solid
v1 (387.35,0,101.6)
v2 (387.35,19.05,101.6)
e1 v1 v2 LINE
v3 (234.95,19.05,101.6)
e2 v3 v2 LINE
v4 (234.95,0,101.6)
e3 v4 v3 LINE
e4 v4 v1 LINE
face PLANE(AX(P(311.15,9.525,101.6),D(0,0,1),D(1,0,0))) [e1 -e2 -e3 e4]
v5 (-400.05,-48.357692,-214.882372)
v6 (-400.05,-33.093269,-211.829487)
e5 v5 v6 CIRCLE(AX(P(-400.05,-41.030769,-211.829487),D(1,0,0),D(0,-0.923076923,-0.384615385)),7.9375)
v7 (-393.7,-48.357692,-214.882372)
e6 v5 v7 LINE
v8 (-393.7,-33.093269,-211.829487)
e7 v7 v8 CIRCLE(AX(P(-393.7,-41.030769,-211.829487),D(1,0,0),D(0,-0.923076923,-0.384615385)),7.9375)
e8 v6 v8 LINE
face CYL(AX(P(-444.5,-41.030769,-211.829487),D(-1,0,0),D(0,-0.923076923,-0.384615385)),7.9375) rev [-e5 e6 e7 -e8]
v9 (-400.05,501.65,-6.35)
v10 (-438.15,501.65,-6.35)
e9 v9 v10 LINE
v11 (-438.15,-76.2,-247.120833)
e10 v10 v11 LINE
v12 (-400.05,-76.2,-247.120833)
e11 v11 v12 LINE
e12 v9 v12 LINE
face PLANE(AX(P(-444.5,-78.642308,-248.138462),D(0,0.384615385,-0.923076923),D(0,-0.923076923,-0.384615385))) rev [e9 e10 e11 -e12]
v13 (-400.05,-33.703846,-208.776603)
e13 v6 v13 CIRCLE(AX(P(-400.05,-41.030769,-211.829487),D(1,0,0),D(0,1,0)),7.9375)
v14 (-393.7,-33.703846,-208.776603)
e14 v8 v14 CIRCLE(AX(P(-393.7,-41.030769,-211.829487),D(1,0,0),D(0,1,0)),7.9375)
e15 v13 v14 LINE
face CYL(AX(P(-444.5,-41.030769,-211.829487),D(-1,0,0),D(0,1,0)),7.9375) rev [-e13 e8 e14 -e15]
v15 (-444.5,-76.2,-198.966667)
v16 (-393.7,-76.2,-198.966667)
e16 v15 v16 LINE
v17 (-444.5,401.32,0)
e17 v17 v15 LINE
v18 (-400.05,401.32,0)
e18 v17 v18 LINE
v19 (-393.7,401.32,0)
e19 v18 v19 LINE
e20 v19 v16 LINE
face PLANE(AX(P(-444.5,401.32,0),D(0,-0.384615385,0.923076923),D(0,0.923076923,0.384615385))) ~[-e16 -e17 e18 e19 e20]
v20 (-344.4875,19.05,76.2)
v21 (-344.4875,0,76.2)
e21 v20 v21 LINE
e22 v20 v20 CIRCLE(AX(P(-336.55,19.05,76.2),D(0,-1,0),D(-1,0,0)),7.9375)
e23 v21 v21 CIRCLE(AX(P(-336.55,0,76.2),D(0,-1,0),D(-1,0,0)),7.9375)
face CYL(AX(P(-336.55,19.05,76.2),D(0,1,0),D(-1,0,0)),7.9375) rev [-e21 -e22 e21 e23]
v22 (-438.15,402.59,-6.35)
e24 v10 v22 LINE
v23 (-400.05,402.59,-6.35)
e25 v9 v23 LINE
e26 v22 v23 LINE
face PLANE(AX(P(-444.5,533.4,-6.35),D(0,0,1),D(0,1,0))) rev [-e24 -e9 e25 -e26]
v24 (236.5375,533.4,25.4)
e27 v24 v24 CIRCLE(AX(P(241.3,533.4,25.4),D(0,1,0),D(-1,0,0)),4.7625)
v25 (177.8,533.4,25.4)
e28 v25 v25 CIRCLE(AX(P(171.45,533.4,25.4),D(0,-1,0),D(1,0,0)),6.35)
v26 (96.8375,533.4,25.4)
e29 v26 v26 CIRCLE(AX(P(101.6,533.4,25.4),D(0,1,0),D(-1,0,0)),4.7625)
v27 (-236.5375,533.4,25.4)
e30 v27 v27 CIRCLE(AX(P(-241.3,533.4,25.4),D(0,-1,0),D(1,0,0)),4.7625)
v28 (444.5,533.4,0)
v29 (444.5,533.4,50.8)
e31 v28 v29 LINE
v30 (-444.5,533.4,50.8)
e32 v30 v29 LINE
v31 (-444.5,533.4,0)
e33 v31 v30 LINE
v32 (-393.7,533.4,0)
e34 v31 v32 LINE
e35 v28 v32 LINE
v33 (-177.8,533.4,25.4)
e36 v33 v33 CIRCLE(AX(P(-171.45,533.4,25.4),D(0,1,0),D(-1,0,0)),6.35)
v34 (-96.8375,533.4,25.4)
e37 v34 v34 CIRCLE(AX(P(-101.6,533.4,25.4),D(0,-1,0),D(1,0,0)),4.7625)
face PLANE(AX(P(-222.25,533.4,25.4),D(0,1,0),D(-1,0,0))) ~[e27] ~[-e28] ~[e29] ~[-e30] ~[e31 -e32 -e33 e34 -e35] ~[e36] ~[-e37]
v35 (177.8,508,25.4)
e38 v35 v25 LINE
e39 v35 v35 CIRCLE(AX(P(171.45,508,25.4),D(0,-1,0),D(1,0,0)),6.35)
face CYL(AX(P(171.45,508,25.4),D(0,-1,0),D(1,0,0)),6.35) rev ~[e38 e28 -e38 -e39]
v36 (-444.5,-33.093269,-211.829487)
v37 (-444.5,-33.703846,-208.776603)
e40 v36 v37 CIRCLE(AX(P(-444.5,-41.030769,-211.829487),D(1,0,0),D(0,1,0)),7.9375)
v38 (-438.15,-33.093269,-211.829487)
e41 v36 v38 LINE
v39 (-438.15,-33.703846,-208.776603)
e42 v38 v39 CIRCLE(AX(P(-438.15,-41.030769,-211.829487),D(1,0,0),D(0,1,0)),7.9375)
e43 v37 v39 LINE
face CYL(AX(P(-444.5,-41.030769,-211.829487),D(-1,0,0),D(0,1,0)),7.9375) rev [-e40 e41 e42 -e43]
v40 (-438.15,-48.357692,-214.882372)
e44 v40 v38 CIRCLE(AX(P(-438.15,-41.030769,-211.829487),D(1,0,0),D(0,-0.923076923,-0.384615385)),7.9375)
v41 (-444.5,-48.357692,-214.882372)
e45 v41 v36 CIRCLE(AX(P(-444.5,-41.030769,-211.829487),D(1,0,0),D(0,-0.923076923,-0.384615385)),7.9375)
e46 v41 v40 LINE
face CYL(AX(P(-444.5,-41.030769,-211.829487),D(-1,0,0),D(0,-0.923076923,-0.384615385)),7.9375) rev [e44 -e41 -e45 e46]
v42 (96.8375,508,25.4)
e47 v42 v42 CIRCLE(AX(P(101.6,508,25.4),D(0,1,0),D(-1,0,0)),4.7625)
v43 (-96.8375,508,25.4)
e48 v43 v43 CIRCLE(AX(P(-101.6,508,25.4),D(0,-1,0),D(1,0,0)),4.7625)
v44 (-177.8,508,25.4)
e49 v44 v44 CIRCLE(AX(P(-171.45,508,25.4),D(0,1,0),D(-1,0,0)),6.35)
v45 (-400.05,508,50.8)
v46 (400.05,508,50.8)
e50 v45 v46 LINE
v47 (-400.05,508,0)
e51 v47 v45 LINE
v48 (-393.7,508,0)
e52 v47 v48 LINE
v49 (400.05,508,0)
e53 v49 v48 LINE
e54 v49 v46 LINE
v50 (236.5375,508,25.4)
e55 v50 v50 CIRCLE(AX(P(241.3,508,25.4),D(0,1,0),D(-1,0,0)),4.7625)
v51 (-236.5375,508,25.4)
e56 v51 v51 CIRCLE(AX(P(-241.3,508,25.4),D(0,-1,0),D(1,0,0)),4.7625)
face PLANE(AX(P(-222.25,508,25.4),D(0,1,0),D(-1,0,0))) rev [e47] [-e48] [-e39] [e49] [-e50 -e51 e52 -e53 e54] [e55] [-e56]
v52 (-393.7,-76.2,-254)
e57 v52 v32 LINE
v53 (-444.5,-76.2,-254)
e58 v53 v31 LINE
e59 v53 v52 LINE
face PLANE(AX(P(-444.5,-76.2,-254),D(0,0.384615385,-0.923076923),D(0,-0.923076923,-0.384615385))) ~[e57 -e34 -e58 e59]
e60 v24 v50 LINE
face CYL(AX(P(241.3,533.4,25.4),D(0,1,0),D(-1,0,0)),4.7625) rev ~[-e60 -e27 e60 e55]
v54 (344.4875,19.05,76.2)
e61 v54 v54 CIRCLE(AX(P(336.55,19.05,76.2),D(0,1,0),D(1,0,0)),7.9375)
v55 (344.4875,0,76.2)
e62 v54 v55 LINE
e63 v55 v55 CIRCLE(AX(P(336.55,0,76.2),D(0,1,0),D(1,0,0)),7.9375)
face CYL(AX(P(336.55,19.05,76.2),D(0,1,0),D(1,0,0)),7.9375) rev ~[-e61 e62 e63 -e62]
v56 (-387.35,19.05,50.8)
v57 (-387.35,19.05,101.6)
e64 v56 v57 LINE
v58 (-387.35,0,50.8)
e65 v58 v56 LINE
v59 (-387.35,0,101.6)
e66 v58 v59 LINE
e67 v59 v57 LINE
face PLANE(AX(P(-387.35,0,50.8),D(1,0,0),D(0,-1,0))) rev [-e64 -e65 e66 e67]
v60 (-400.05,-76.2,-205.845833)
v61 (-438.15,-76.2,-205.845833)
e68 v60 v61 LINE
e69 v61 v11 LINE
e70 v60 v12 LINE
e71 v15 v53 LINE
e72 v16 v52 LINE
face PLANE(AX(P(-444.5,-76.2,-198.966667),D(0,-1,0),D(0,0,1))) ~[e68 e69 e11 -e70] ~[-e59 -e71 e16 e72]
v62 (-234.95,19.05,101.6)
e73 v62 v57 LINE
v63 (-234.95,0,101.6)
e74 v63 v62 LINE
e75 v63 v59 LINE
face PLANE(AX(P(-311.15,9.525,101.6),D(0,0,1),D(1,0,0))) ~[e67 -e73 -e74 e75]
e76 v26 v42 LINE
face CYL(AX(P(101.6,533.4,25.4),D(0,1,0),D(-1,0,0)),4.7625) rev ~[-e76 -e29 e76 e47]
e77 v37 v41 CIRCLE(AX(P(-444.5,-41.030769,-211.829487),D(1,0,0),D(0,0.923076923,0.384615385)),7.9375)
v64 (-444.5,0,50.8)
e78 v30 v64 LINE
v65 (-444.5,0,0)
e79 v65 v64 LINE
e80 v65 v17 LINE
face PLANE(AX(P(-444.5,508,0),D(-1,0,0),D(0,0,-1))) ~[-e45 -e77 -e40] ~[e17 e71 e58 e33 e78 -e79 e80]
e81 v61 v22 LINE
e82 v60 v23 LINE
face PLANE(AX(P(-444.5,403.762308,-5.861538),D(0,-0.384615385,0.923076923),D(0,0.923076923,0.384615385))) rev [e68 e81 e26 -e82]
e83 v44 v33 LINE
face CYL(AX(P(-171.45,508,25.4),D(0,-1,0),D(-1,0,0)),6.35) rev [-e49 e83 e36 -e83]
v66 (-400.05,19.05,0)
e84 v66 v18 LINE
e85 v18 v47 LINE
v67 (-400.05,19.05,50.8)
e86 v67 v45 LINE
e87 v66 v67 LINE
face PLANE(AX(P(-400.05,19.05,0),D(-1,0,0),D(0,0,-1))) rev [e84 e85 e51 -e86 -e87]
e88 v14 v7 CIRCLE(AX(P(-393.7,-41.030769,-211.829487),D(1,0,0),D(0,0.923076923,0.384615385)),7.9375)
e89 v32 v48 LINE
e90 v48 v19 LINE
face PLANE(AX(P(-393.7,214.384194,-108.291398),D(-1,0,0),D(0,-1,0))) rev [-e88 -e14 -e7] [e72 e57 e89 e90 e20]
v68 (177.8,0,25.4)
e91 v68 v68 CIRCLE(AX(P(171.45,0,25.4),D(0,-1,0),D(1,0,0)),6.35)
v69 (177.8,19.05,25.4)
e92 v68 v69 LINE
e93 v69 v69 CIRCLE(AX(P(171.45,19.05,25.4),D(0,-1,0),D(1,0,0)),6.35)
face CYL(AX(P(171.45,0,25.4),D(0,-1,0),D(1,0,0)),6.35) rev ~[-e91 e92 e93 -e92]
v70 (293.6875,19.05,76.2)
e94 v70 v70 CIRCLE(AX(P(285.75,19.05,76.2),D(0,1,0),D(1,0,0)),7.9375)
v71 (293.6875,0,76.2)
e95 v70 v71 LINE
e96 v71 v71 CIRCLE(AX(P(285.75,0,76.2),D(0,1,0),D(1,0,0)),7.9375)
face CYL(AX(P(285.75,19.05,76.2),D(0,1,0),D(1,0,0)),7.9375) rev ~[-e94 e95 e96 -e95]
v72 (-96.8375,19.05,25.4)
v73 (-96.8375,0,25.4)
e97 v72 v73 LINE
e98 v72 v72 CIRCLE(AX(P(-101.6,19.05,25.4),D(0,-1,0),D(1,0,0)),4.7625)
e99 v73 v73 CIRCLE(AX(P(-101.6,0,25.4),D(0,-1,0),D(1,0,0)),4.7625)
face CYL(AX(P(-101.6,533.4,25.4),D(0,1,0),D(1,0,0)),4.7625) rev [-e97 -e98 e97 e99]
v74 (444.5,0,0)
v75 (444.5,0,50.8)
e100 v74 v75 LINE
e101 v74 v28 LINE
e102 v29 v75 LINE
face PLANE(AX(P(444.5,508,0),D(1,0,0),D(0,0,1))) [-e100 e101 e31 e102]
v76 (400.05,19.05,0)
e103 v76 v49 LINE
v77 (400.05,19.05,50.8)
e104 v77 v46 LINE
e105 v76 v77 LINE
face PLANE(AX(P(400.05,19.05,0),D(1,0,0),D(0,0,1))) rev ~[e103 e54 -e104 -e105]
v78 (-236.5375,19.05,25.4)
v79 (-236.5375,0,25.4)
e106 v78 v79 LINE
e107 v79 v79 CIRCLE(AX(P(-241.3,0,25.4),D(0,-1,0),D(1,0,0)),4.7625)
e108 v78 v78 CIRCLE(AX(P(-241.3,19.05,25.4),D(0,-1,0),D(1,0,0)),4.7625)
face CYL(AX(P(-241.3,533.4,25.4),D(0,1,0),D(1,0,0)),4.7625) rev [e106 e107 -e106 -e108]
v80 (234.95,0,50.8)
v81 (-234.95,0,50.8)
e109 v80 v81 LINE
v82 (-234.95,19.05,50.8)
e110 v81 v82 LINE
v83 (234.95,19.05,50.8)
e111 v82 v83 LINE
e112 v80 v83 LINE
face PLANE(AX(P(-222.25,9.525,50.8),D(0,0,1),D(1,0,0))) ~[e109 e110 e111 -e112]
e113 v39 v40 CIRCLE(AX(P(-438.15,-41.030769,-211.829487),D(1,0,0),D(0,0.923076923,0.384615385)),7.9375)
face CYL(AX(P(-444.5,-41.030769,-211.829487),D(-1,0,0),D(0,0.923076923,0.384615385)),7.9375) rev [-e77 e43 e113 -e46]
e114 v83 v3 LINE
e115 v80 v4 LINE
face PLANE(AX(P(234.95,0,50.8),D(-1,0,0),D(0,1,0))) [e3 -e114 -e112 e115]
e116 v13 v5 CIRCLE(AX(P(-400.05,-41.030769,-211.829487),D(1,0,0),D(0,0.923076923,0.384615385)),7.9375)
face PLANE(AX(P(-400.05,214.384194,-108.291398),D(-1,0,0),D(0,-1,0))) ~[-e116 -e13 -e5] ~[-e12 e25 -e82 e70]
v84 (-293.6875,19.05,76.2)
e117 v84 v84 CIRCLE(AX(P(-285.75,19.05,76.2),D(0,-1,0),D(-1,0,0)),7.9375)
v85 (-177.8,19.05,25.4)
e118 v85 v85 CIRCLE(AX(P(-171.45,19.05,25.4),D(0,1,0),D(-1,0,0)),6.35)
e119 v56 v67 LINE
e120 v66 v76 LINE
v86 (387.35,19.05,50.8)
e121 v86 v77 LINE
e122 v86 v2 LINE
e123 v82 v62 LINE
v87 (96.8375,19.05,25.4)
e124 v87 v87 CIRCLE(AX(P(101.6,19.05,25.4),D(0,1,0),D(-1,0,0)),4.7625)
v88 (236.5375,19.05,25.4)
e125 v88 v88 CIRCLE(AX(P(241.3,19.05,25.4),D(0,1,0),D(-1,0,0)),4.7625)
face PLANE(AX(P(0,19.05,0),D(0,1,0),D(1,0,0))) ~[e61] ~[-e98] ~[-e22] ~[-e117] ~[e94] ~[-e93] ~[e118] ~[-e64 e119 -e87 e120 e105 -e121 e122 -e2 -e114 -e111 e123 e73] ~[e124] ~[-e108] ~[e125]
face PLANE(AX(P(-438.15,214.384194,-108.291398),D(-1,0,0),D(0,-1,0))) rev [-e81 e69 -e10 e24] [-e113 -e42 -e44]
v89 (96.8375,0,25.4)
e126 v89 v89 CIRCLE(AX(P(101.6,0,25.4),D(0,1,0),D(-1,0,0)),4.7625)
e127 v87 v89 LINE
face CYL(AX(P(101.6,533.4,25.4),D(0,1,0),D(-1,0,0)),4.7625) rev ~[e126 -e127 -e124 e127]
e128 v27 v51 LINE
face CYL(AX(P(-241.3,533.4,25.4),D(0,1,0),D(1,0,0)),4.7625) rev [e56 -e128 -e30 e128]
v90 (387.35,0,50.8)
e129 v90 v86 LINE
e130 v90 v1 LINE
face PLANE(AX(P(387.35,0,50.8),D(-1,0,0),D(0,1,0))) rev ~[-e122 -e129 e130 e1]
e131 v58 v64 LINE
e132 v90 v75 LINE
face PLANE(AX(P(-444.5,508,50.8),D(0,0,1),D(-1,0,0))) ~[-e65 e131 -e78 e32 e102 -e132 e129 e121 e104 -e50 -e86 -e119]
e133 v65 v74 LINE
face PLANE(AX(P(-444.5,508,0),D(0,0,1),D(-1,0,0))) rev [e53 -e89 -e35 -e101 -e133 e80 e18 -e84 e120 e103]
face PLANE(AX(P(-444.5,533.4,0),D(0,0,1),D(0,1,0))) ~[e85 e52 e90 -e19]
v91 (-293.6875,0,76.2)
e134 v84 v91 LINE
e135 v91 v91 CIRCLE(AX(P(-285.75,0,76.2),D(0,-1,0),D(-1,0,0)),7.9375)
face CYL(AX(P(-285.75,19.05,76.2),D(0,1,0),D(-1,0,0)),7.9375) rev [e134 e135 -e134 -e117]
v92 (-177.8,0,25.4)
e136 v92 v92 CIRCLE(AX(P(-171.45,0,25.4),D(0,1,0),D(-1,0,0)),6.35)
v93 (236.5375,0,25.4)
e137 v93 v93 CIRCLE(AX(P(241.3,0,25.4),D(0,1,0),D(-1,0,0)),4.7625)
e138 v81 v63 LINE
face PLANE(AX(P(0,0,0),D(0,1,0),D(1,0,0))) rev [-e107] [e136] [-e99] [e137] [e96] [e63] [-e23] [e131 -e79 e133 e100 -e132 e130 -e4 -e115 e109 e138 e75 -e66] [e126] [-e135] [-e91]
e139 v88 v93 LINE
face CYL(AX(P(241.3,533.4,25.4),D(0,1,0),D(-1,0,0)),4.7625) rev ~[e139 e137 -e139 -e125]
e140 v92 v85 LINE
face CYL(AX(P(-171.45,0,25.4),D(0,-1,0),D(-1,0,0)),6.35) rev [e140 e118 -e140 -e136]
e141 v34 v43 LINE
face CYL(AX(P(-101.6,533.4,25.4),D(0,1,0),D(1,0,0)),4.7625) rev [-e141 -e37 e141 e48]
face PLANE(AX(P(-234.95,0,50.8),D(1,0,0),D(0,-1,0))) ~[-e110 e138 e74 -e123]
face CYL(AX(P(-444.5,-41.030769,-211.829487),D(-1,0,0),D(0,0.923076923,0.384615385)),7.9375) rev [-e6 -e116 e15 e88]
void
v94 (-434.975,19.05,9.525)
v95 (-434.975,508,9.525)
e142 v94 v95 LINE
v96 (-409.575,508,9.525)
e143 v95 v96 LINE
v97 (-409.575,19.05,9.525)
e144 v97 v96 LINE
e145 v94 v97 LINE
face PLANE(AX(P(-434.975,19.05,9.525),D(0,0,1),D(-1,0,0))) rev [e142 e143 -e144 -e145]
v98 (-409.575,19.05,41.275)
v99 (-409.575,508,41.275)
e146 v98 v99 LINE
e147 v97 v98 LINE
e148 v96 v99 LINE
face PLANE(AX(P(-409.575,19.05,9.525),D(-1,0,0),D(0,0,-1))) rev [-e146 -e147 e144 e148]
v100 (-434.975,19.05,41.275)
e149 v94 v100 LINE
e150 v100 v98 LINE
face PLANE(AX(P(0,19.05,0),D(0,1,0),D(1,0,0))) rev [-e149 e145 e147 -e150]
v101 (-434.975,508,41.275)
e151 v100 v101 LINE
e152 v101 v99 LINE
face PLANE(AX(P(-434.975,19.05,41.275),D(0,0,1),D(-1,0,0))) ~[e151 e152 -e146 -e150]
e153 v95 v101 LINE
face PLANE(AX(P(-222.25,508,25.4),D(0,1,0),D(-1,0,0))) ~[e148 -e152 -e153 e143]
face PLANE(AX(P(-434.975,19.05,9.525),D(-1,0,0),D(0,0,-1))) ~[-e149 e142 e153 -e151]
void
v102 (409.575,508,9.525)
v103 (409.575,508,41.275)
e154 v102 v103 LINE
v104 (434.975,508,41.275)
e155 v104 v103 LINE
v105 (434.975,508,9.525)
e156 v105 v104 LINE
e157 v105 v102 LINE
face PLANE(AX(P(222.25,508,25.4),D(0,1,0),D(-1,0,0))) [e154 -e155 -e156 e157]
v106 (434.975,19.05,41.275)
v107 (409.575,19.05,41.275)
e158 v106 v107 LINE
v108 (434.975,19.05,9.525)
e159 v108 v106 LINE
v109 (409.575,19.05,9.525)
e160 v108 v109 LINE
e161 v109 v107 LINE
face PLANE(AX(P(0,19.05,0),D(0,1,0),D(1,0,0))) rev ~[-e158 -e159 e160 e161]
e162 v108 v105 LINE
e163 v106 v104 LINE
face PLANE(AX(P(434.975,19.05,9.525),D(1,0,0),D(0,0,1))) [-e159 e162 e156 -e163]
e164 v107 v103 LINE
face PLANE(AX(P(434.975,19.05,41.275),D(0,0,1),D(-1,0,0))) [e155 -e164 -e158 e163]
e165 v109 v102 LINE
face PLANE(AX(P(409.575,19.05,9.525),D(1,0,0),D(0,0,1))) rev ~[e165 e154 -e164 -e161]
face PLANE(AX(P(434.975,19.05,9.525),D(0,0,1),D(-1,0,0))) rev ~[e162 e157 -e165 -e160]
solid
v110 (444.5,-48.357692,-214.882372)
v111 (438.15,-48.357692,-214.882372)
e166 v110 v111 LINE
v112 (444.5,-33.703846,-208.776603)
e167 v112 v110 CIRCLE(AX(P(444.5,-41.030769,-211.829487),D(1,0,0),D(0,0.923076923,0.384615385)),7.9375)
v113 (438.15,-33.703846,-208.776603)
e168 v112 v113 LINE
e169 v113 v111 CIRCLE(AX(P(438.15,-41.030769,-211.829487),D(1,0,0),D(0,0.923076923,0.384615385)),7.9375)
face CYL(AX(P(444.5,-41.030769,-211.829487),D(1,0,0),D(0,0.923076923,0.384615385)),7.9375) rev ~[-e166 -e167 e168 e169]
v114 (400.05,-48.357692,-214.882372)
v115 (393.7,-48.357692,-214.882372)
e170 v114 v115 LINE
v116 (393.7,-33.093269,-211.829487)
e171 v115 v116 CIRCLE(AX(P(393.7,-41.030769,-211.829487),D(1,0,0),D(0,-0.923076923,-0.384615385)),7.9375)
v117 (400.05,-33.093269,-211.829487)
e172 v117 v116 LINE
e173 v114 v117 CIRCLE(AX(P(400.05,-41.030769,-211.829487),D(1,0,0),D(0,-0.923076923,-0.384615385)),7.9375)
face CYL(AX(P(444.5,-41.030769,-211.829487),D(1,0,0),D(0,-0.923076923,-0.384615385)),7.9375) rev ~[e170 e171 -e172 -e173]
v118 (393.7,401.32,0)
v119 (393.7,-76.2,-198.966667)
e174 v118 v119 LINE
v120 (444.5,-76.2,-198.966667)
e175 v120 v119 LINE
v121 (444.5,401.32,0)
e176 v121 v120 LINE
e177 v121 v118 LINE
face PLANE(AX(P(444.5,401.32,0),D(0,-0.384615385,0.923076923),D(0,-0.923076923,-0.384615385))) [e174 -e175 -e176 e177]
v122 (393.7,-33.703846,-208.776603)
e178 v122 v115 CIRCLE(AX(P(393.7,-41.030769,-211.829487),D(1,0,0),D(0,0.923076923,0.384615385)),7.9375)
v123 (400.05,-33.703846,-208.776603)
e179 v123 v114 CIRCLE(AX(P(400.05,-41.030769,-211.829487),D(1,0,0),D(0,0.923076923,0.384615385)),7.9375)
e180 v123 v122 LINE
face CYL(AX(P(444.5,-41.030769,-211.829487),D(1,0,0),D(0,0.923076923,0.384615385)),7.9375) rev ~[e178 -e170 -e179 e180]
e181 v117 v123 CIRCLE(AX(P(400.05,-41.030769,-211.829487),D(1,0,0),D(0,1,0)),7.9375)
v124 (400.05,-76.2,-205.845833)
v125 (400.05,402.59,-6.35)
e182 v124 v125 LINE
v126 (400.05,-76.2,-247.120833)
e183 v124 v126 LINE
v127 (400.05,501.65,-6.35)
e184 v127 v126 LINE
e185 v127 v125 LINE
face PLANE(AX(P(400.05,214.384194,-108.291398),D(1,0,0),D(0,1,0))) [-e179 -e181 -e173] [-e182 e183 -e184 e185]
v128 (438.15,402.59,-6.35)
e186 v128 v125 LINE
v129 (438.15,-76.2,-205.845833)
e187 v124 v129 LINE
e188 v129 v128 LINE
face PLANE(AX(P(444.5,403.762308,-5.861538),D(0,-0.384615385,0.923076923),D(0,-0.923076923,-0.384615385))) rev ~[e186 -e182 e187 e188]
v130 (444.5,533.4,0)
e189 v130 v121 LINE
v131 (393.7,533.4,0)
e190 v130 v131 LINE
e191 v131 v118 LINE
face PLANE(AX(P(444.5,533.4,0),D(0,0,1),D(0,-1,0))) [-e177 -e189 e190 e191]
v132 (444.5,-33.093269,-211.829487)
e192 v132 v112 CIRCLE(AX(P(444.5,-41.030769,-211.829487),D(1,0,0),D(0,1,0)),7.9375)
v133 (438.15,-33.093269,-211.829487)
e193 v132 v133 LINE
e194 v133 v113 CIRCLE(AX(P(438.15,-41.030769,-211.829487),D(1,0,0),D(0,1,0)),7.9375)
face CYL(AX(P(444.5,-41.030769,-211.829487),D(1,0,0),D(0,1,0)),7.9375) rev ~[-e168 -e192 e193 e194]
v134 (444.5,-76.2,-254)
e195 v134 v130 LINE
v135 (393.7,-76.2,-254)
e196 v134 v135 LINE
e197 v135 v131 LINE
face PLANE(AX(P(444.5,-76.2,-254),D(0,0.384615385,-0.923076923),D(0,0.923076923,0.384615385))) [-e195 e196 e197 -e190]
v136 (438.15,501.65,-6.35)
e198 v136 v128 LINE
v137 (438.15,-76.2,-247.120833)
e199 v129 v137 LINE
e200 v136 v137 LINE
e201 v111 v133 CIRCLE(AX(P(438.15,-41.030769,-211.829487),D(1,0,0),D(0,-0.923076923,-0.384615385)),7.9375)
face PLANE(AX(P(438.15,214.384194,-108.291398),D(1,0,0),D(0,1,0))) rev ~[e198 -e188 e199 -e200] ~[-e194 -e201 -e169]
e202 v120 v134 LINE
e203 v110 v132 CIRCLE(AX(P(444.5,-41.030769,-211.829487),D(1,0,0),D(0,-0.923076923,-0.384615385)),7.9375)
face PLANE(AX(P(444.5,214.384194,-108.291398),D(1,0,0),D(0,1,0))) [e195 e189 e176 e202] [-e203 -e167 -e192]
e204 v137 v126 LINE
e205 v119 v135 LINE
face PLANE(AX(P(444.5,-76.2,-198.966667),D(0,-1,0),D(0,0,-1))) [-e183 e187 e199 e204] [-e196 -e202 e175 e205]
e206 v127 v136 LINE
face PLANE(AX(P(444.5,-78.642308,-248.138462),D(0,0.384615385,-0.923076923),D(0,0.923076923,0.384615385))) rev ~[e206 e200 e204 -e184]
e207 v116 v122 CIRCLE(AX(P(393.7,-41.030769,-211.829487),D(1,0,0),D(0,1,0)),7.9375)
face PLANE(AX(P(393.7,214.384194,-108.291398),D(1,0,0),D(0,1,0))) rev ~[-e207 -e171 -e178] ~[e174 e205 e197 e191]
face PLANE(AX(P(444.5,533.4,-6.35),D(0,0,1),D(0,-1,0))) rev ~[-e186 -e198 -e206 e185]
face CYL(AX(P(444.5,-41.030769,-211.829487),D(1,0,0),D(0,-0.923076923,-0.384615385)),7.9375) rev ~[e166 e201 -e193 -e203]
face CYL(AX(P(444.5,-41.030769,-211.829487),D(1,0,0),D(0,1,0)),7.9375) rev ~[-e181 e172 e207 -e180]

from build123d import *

# Parameters (mm, degrees)
F0_W      = 444.5
F0_H      = 19.05
F1_DEPTH  = 50.8
F2_W      = 152.4
F2_H      = 19.05
F3_DEPTH  = 50.8
F4_W      = 44.45
F4_H      = 50.8
F4_W_2    = 25.4
F4_H_2    = 31.75
F5_DEPTH  = 488.95
F6_W      = 444.5
F6_H      = 50.8
F7_DEPTH  = 25.4
F9_DEPTH  = 25.4
F10_R     = 6.35
F11_DEPTH = 25.4
F13_DEPTH = 50.8
F14_T     = -6.35
F16_DEPTH = 444.501
F17_DEPTH = 444.501
F19_R     = 6.35
F20_DEPTH = 25.4
F18_R     = 4.7625
F21_DEPTH = 609.601


with BuildPart() as f1:
    # F0 (on Top) → F1 (new body)
    with BuildSketch(Plane.XY):
        with Locations((222.25, 9.525)):
            Rectangle(F0_W, F0_H)
    extrude(amount=F1_DEPTH)

    # F2 (on face) → F3 (join)
    with BuildSketch(Plane.XY.offset(50.8)):
        with Locations((311.15, 9.525)):
            Rectangle(F2_W, F2_H)
    extrude(amount=F3_DEPTH)

    # F4 (on face) → F5 (join)
    with BuildSketch(Plane(origin=(0, 19.05, 0), x_dir=(-1, 0, 0), z_dir=(0, 1, 0))):
        with Locations((-422.275, 25.4)):
            Rectangle(F4_W, F4_H)
        with Locations((-422.275, 25.4)):
            Rectangle(F4_W_2, F4_H_2, mode=Mode.SUBTRACT)
    extrude(amount=F5_DEPTH)

    # F6 (on face) → F7 (join)
    with BuildSketch(Plane(origin=(0, 508, 0), x_dir=(-1, 0, 0), z_dir=(0, 1, 0))):
        with Locations((-222.25, 25.4)):
            Rectangle(F6_W, F6_H)
    extrude(amount=F7_DEPTH)

    # F8 (on face) → F9 (cut)
    with BuildSketch(Plane(origin=(0, 19.05, 0), x_dir=(-1, 0, 0), z_dir=(0, 1, 0))):
        with BuildLine():
            ThreePointArc((-328.6125, 76.2), (-336.55, 84.1375), (-344.4875, 76.2))
            Line((-344.4875, 76.2), (-336.55, 76.2))
            Line((-336.55, 76.2), (-328.6125, 76.2))
        make_face()
        with BuildLine():
            ThreePointArc((-277.8125, 76.2), (-285.75, 84.1375), (-293.6875, 76.2))
            ThreePointArc((-293.6875, 76.2), (-285.75, 68.2625), (-277.8125, 76.2))
        make_face()
        with BuildLine():
            Line((-336.55, 76.2), (-344.4875, 76.2))
            ThreePointArc((-344.4875, 76.2), (-336.55, 68.2625), (-328.6125, 76.2))
            Line((-328.6125, 76.2), (-336.55, 76.2))
        make_face()
    extrude(amount=-F9_DEPTH, mode=Mode.SUBTRACT)

    # F10 (on face) → F11 (cut)
    with BuildSketch(Plane.XZ):
        with Locations((171.45, 25.4)):
            Circle(F10_R)
    extrude(amount=-F11_DEPTH, mode=Mode.SUBTRACT)

    # F15 (on face) → F17 (cut, through all)
    with BuildSketch(Plane.YZ.offset(444.5)):
        with BuildLine():
            ThreePointArc((-33.7038461538, -208.7766025641), (-44.0836538462, -204.5025641026), (-48.3576923077, -214.8823717949))
            Line((-48.3576923077, -214.8823717949), (-33.7038461538, -208.7766025641))
        make_face()
        with BuildLine():
            Line((-33.7038461538, -208.7766025641), (-48.3576923077, -214.8823717949))
            ThreePointArc((-48.3576923077, -214.8823717949), (-39.4740974081, -219.6128462928), (-33.0932692308, -211.8294871795))
            ThreePointArc((-33.0932692308, -211.8294871795), (-33.2474101175, -210.2728153568), (-33.7038461538, -208.7766025641))
        make_face()
    extrude(amount=-F17_DEPTH, mode=Mode.SUBTRACT)

    # F19 (on face) → F20 (cut)
    with BuildSketch(Plane.XZ.offset(-508)):
        with Locations((171.45, 25.4)):
            Circle(F19_R)
    extrude(amount=-F20_DEPTH, mode=Mode.SUBTRACT)

    # F18 (on face) → F21 (cut, through all)
    with BuildSketch(Plane(origin=(0, 533.4, 0), x_dir=(-1, 0, 0), z_dir=(0, 1, 0))):
        with Locations((-241.3, 25.4)):
            Circle(F18_R)
        with Locations((-101.6, 25.4)):
            Circle(F18_R)
    extrude(amount=-F21_DEPTH, mode=Mode.SUBTRACT)



with BuildPart() as f13:
    # F12 (on face) → F13 (new body)
    with BuildSketch(Plane.YZ.offset(444.5)):
        Polygon((401.32, 0), (-76.2, -198.9666666667), (-76.2, -254), (533.4, 0), align=None)
    extrude(amount=-F13_DEPTH)

    # F14
    f14_openings = [f13.faces().sort_by_distance(p)[0] for p in [
        (419.1, -76.2, -226.483333),
    ]]
    offset(amount=F14_T, openings=f14_openings)

    # F15 (on face) → F16 (cut, through all)
    with BuildSketch(Plane.YZ.offset(444.5)):
        with BuildLine():
            ThreePointArc((-33.7038461538, -208.7766025641), (-44.0836538462, -204.5025641026), (-48.3576923077, -214.8823717949))
            Line((-48.3576923077, -214.8823717949), (-33.7038461538, -208.7766025641))
        make_face()
        with BuildLine():
            Line((-33.7038461538, -208.7766025641), (-48.3576923077, -214.8823717949))
            ThreePointArc((-48.3576923077, -214.8823717949), (-39.4740974081, -219.6128462928), (-33.0932692308, -211.8294871795))
            ThreePointArc((-33.0932692308, -211.8294871795), (-33.2474101175, -210.2728153568), (-33.7038461538, -208.7766025641))
        make_face()
    extrude(amount=-F16_DEPTH, mode=Mode.SUBTRACT)


with BuildPart() as f1_1:
    add(f1.part)
    # F22: F13, F1 across plane
    add(f13.part.mirror(Plane.YZ))
    add(f1.part.mirror(Plane.YZ))


solid = Compound([f13.part, f1_1.part])
